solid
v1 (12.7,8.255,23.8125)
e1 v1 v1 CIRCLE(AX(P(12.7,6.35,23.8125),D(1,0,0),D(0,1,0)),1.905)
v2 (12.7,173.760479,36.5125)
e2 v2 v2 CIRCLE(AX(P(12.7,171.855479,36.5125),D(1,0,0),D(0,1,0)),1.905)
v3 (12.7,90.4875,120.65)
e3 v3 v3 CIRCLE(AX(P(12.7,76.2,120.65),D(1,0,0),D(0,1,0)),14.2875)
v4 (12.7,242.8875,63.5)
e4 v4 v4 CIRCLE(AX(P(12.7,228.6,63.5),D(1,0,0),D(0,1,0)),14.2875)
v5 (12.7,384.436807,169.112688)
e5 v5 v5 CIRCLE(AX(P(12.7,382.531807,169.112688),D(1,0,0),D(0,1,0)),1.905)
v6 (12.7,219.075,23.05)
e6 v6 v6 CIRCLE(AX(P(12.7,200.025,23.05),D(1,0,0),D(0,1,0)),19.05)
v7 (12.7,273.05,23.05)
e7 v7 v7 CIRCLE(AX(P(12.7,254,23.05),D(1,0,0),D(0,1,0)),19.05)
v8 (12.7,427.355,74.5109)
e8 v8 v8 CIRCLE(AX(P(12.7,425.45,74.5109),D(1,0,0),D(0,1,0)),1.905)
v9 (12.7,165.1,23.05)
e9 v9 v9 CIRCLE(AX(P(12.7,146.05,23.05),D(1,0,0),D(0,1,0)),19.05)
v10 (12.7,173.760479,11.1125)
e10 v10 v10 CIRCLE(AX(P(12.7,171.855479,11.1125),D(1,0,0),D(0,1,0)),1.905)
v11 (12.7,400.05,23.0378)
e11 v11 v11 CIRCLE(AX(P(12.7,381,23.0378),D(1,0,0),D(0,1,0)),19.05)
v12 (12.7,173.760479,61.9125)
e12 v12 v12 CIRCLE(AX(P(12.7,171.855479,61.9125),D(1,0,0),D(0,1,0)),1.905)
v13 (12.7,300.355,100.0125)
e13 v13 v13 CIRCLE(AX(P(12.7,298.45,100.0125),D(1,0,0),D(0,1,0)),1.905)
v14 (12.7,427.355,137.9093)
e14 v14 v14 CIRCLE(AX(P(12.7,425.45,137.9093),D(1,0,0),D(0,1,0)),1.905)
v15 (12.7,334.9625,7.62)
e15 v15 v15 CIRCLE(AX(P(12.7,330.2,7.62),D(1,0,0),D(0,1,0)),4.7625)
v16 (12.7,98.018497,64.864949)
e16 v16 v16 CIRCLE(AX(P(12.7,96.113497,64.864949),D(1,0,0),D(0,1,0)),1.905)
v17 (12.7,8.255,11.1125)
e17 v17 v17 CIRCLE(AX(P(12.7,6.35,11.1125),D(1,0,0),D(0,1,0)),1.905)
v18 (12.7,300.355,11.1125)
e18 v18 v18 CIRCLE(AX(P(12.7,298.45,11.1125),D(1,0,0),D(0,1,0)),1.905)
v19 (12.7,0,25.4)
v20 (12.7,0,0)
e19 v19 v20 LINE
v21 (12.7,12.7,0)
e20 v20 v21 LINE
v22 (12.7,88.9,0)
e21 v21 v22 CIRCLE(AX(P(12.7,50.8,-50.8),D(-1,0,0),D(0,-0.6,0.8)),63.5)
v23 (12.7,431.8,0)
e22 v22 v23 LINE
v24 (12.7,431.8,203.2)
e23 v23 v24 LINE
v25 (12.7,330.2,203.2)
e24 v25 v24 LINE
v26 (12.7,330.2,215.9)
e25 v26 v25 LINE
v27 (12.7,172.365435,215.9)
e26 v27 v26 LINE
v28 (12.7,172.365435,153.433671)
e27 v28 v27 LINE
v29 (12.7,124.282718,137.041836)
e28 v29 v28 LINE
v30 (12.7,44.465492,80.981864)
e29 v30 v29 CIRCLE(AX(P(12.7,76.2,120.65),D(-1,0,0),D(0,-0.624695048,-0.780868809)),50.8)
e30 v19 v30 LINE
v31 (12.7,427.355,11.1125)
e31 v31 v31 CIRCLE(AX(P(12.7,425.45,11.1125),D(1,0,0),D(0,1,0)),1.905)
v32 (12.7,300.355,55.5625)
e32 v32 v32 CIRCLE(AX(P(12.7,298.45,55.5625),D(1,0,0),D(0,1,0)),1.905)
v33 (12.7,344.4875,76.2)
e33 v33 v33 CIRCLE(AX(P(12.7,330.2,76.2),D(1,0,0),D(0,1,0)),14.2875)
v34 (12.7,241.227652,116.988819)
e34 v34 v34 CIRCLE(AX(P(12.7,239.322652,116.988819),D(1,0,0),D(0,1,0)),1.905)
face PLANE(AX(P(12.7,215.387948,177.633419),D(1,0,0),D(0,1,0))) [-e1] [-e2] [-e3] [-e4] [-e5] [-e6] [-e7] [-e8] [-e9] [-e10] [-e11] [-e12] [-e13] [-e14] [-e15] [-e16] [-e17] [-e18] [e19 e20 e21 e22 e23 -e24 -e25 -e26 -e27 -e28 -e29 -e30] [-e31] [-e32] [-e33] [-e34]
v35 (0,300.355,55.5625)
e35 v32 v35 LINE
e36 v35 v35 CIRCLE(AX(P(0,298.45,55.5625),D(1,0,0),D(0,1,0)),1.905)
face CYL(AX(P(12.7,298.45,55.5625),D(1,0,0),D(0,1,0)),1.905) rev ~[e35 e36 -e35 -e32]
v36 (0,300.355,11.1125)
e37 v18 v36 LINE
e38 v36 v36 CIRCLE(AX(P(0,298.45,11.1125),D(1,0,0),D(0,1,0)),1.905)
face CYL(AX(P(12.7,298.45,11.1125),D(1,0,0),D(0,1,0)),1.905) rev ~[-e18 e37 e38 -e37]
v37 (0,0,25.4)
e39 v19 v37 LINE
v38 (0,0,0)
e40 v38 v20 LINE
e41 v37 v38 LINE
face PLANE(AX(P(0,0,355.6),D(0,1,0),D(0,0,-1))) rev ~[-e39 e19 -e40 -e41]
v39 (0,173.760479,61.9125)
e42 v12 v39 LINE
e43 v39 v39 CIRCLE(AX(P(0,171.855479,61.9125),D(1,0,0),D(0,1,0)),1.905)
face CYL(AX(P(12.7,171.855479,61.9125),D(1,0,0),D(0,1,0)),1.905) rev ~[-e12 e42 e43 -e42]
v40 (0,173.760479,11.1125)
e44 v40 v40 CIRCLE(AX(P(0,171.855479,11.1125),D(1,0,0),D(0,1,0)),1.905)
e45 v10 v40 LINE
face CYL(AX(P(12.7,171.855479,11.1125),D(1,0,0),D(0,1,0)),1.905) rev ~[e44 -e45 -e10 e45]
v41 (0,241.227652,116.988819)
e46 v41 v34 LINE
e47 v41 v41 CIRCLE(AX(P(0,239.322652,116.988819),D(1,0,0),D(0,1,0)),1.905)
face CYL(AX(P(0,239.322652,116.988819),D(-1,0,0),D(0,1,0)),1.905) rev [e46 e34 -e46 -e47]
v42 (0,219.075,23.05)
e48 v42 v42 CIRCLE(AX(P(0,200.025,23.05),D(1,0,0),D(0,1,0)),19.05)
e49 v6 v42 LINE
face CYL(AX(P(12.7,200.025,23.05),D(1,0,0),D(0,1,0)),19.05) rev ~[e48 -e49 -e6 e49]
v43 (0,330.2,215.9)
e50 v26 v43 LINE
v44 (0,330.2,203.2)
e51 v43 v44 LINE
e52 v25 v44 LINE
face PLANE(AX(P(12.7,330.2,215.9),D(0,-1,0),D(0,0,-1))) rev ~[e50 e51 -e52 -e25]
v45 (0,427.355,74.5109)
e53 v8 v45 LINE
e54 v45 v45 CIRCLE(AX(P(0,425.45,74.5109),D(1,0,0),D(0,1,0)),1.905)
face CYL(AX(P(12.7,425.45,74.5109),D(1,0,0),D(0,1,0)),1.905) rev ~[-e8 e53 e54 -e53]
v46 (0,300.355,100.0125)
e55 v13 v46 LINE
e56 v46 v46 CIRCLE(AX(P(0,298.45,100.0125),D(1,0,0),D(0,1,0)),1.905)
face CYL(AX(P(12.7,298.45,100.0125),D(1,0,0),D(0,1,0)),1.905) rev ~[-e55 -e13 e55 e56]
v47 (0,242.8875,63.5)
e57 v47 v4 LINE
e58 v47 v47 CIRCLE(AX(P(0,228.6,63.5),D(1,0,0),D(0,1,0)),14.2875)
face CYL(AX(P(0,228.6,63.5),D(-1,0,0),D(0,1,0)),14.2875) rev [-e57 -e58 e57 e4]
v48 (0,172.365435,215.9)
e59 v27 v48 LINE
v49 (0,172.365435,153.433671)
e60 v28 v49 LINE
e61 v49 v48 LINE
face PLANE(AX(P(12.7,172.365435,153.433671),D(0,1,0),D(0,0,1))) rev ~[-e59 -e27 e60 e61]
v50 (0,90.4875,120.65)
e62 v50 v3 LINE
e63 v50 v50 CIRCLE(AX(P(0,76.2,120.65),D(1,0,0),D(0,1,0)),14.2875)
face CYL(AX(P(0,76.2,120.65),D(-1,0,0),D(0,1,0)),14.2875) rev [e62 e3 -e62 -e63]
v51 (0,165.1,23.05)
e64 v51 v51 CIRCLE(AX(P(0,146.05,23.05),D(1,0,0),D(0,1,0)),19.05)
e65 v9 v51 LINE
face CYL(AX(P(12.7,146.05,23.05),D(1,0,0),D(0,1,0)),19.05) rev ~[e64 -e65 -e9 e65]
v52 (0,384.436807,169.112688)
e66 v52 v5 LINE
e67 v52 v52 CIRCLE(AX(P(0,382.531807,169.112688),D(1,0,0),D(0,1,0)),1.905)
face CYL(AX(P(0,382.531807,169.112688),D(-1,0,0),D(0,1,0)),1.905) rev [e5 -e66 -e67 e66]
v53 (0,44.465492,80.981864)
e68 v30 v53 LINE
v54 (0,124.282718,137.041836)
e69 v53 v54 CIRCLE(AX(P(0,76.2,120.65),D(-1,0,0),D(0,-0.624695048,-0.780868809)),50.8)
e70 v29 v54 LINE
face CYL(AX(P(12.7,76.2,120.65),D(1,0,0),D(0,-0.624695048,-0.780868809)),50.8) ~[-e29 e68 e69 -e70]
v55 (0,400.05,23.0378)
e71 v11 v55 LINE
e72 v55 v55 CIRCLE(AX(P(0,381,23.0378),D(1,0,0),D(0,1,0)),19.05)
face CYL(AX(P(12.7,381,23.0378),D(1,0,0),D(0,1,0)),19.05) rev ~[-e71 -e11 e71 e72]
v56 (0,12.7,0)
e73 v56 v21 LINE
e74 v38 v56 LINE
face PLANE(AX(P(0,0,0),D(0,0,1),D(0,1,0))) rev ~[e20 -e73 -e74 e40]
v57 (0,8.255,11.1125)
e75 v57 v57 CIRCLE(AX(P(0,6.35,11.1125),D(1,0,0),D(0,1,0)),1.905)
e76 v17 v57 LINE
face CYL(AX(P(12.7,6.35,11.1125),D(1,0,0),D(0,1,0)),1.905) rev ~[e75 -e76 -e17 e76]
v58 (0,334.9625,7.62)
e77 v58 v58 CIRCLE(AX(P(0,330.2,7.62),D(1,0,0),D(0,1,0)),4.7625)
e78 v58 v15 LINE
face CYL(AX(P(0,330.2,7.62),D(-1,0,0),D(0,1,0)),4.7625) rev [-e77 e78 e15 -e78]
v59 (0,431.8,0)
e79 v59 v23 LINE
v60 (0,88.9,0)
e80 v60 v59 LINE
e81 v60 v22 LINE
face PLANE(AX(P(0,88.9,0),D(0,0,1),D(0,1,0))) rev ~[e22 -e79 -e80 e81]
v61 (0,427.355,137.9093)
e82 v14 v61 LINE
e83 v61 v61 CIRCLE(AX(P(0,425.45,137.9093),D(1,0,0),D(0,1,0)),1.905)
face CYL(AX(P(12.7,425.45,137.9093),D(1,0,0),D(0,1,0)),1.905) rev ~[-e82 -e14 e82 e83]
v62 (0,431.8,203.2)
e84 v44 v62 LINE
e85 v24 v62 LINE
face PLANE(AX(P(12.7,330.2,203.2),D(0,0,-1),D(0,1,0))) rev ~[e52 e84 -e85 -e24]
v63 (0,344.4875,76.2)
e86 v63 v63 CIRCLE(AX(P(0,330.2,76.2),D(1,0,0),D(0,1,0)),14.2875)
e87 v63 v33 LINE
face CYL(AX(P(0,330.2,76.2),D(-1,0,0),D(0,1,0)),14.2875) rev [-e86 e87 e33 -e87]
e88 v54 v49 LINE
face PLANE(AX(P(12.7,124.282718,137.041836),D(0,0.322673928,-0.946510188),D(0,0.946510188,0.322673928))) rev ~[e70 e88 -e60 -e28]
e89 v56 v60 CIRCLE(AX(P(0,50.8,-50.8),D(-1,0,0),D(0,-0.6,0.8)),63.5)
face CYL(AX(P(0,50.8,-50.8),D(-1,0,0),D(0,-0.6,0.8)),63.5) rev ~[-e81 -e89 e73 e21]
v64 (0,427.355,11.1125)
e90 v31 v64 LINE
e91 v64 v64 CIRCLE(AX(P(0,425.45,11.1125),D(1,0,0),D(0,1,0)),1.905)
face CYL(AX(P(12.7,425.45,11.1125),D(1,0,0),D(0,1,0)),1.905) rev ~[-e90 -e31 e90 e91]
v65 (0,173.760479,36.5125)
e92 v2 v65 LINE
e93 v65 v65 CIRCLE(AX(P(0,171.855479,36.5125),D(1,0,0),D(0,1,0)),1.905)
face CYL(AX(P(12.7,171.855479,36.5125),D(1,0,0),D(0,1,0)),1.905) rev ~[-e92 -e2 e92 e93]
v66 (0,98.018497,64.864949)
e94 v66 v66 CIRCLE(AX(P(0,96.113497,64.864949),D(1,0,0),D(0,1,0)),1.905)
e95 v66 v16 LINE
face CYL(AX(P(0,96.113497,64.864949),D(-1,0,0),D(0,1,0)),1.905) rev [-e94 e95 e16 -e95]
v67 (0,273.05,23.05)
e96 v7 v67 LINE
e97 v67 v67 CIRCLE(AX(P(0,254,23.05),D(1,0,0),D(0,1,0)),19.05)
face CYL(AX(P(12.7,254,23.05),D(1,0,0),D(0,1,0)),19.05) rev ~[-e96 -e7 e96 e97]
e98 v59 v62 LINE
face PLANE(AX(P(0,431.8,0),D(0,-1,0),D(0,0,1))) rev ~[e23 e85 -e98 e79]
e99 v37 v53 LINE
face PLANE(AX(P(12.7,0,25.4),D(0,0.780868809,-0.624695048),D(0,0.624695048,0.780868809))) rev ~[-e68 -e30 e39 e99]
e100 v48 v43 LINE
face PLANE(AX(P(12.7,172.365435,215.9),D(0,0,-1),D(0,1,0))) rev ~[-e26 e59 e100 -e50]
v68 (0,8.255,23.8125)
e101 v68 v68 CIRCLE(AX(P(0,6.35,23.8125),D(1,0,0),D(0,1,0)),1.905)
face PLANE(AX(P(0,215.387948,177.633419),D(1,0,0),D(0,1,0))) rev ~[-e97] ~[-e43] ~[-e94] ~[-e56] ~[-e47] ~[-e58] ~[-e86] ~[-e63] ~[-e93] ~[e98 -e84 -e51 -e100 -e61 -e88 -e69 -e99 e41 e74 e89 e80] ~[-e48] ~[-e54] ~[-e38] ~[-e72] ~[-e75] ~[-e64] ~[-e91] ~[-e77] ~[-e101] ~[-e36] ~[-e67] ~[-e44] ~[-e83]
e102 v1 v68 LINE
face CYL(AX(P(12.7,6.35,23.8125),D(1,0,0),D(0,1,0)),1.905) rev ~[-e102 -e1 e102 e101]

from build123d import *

# Parameters (mm, degrees)
F0_R     = 1.905
F0_R_2   = 14.2875
F0_R_3   = 4.7625
F1_DEPTH = 12.7
F2_R     = 19.05
F3_DEPTH = 12.7
F5_DEPTH = 12.7
F6_R     = 1.905
F7_DEPTH = 12.7


with BuildPart() as f1:
    # F0 (on Right) → F1 (new body)
    with BuildSketch(Plane.YZ):
        with BuildLine():
            Line((0, 355.6), (0, 0))
            Line((0, 0), (12.7, 0))
            ThreePointArc((12.7, 0), (50.8, 12.7), (88.9, 0))
            Line((88.9, 0), (431.8, 0))
            Line((431.8, 0), (431.8, 355.6))
            Line((431.8, 355.6), (0, 355.6))
        make_face()
        with Locations((96.1134966165, 64.8649486739)):
            Circle(F0_R, mode=Mode.SUBTRACT)
        with Locations((228.6, 63.5)):
            Circle(F0_R_2, mode=Mode.SUBTRACT)
        with Locations((239.3226520243, 116.9888185167)):
            Circle(F0_R, mode=Mode.SUBTRACT)
        with Locations((330.2, 7.62)):
            Circle(F0_R_3, mode=Mode.SUBTRACT)
        with Locations((330.2, 76.2)):
            Circle(F0_R_2, mode=Mode.SUBTRACT)
        with Locations((76.2, 120.65)):
            Circle(F0_R_2, mode=Mode.SUBTRACT)
        with Locations((382.531807432, 169.1126883595)):
            Circle(F0_R, mode=Mode.SUBTRACT)
    extrude(amount=F1_DEPTH)

    # F2 (on face) → F3 (cut, through all)
    with BuildSketch(Plane.YZ.offset(12.7)):
        with Locations((146.05, 23.05)):
            Circle(F2_R)
        with Locations((254, 23.05)):
            Circle(F2_R)
        with Locations((381, 23.0378)):
            Circle(F2_R)
        with Locations((200.025, 23.05)):
            Circle(F2_R)
    extrude(amount=-F3_DEPTH, mode=Mode.SUBTRACT)

    # F4 (on face) → F5 (cut, through all)
    with BuildSketch(Plane.YZ.offset(12.7)):
        Polygon((431.8, 355.6), (0, 355.6), (0, 215.9), (172.3654351189, 215.9), (330.2, 215.9), (355.6, 215.9), (431.8, 215.9), align=None)
        with BuildLine():
            Line((172.3654351189, 215.9), (0, 215.9))
            Line((0, 215.9), (0, 25.4))
            Line((0, 25.4), (44.4654915842, 80.9818644803))
            ThreePointArc((44.4654915842, 80.9818644803), (47.0024645882, 162.2209505049), (124.2827175595, 137.0418355316))
            Line((124.2827175595, 137.0418355316), (172.3654351189, 153.4336710633))
            Line((172.3654351189, 153.4336710633), (172.3654351189, 215.9))
        make_face()
        Polygon((431.8, 203.2), (431.8, 215.9), (355.6, 215.9), (330.2, 207.2409090909), (330.2, 203.2), align=None)
        Polygon((330.2, 207.2409090909), (355.6, 215.9), (330.2, 215.9), align=None)
    extrude(amount=-F5_DEPTH, mode=Mode.SUBTRACT)

    # F6 (on face) → F7 (cut, through all)
    with BuildSketch(Plane.YZ.offset(12.7)):
        with Locations((425.45, 11.1125)):
            Circle(F6_R)
        with Locations((425.45, 74.5109)):
            Circle(F6_R)
        with Locations((425.45, 137.9093)):
            Circle(F6_R)
        with Locations((298.45, 11.1125)):
            Circle(F6_R)
        with Locations((298.45, 100.0125)):
            Circle(F6_R)
        with Locations((298.45, 55.5625)):
            Circle(F6_R)
        with Locations((171.8554794788, 11.1125)):
            Circle(F6_R)
        with Locations((171.8554794788, 36.5125)):
            Circle(F6_R)
        with Locations((171.8554794788, 61.9125)):
            Circle(F6_R)
        with Locations((6.35, 11.1125)):
            Circle(F6_R)
        with Locations((6.35, 23.8125)):
            Circle(F6_R)
    extrude(amount=-F7_DEPTH, mode=Mode.SUBTRACT)


solid = f1.part
